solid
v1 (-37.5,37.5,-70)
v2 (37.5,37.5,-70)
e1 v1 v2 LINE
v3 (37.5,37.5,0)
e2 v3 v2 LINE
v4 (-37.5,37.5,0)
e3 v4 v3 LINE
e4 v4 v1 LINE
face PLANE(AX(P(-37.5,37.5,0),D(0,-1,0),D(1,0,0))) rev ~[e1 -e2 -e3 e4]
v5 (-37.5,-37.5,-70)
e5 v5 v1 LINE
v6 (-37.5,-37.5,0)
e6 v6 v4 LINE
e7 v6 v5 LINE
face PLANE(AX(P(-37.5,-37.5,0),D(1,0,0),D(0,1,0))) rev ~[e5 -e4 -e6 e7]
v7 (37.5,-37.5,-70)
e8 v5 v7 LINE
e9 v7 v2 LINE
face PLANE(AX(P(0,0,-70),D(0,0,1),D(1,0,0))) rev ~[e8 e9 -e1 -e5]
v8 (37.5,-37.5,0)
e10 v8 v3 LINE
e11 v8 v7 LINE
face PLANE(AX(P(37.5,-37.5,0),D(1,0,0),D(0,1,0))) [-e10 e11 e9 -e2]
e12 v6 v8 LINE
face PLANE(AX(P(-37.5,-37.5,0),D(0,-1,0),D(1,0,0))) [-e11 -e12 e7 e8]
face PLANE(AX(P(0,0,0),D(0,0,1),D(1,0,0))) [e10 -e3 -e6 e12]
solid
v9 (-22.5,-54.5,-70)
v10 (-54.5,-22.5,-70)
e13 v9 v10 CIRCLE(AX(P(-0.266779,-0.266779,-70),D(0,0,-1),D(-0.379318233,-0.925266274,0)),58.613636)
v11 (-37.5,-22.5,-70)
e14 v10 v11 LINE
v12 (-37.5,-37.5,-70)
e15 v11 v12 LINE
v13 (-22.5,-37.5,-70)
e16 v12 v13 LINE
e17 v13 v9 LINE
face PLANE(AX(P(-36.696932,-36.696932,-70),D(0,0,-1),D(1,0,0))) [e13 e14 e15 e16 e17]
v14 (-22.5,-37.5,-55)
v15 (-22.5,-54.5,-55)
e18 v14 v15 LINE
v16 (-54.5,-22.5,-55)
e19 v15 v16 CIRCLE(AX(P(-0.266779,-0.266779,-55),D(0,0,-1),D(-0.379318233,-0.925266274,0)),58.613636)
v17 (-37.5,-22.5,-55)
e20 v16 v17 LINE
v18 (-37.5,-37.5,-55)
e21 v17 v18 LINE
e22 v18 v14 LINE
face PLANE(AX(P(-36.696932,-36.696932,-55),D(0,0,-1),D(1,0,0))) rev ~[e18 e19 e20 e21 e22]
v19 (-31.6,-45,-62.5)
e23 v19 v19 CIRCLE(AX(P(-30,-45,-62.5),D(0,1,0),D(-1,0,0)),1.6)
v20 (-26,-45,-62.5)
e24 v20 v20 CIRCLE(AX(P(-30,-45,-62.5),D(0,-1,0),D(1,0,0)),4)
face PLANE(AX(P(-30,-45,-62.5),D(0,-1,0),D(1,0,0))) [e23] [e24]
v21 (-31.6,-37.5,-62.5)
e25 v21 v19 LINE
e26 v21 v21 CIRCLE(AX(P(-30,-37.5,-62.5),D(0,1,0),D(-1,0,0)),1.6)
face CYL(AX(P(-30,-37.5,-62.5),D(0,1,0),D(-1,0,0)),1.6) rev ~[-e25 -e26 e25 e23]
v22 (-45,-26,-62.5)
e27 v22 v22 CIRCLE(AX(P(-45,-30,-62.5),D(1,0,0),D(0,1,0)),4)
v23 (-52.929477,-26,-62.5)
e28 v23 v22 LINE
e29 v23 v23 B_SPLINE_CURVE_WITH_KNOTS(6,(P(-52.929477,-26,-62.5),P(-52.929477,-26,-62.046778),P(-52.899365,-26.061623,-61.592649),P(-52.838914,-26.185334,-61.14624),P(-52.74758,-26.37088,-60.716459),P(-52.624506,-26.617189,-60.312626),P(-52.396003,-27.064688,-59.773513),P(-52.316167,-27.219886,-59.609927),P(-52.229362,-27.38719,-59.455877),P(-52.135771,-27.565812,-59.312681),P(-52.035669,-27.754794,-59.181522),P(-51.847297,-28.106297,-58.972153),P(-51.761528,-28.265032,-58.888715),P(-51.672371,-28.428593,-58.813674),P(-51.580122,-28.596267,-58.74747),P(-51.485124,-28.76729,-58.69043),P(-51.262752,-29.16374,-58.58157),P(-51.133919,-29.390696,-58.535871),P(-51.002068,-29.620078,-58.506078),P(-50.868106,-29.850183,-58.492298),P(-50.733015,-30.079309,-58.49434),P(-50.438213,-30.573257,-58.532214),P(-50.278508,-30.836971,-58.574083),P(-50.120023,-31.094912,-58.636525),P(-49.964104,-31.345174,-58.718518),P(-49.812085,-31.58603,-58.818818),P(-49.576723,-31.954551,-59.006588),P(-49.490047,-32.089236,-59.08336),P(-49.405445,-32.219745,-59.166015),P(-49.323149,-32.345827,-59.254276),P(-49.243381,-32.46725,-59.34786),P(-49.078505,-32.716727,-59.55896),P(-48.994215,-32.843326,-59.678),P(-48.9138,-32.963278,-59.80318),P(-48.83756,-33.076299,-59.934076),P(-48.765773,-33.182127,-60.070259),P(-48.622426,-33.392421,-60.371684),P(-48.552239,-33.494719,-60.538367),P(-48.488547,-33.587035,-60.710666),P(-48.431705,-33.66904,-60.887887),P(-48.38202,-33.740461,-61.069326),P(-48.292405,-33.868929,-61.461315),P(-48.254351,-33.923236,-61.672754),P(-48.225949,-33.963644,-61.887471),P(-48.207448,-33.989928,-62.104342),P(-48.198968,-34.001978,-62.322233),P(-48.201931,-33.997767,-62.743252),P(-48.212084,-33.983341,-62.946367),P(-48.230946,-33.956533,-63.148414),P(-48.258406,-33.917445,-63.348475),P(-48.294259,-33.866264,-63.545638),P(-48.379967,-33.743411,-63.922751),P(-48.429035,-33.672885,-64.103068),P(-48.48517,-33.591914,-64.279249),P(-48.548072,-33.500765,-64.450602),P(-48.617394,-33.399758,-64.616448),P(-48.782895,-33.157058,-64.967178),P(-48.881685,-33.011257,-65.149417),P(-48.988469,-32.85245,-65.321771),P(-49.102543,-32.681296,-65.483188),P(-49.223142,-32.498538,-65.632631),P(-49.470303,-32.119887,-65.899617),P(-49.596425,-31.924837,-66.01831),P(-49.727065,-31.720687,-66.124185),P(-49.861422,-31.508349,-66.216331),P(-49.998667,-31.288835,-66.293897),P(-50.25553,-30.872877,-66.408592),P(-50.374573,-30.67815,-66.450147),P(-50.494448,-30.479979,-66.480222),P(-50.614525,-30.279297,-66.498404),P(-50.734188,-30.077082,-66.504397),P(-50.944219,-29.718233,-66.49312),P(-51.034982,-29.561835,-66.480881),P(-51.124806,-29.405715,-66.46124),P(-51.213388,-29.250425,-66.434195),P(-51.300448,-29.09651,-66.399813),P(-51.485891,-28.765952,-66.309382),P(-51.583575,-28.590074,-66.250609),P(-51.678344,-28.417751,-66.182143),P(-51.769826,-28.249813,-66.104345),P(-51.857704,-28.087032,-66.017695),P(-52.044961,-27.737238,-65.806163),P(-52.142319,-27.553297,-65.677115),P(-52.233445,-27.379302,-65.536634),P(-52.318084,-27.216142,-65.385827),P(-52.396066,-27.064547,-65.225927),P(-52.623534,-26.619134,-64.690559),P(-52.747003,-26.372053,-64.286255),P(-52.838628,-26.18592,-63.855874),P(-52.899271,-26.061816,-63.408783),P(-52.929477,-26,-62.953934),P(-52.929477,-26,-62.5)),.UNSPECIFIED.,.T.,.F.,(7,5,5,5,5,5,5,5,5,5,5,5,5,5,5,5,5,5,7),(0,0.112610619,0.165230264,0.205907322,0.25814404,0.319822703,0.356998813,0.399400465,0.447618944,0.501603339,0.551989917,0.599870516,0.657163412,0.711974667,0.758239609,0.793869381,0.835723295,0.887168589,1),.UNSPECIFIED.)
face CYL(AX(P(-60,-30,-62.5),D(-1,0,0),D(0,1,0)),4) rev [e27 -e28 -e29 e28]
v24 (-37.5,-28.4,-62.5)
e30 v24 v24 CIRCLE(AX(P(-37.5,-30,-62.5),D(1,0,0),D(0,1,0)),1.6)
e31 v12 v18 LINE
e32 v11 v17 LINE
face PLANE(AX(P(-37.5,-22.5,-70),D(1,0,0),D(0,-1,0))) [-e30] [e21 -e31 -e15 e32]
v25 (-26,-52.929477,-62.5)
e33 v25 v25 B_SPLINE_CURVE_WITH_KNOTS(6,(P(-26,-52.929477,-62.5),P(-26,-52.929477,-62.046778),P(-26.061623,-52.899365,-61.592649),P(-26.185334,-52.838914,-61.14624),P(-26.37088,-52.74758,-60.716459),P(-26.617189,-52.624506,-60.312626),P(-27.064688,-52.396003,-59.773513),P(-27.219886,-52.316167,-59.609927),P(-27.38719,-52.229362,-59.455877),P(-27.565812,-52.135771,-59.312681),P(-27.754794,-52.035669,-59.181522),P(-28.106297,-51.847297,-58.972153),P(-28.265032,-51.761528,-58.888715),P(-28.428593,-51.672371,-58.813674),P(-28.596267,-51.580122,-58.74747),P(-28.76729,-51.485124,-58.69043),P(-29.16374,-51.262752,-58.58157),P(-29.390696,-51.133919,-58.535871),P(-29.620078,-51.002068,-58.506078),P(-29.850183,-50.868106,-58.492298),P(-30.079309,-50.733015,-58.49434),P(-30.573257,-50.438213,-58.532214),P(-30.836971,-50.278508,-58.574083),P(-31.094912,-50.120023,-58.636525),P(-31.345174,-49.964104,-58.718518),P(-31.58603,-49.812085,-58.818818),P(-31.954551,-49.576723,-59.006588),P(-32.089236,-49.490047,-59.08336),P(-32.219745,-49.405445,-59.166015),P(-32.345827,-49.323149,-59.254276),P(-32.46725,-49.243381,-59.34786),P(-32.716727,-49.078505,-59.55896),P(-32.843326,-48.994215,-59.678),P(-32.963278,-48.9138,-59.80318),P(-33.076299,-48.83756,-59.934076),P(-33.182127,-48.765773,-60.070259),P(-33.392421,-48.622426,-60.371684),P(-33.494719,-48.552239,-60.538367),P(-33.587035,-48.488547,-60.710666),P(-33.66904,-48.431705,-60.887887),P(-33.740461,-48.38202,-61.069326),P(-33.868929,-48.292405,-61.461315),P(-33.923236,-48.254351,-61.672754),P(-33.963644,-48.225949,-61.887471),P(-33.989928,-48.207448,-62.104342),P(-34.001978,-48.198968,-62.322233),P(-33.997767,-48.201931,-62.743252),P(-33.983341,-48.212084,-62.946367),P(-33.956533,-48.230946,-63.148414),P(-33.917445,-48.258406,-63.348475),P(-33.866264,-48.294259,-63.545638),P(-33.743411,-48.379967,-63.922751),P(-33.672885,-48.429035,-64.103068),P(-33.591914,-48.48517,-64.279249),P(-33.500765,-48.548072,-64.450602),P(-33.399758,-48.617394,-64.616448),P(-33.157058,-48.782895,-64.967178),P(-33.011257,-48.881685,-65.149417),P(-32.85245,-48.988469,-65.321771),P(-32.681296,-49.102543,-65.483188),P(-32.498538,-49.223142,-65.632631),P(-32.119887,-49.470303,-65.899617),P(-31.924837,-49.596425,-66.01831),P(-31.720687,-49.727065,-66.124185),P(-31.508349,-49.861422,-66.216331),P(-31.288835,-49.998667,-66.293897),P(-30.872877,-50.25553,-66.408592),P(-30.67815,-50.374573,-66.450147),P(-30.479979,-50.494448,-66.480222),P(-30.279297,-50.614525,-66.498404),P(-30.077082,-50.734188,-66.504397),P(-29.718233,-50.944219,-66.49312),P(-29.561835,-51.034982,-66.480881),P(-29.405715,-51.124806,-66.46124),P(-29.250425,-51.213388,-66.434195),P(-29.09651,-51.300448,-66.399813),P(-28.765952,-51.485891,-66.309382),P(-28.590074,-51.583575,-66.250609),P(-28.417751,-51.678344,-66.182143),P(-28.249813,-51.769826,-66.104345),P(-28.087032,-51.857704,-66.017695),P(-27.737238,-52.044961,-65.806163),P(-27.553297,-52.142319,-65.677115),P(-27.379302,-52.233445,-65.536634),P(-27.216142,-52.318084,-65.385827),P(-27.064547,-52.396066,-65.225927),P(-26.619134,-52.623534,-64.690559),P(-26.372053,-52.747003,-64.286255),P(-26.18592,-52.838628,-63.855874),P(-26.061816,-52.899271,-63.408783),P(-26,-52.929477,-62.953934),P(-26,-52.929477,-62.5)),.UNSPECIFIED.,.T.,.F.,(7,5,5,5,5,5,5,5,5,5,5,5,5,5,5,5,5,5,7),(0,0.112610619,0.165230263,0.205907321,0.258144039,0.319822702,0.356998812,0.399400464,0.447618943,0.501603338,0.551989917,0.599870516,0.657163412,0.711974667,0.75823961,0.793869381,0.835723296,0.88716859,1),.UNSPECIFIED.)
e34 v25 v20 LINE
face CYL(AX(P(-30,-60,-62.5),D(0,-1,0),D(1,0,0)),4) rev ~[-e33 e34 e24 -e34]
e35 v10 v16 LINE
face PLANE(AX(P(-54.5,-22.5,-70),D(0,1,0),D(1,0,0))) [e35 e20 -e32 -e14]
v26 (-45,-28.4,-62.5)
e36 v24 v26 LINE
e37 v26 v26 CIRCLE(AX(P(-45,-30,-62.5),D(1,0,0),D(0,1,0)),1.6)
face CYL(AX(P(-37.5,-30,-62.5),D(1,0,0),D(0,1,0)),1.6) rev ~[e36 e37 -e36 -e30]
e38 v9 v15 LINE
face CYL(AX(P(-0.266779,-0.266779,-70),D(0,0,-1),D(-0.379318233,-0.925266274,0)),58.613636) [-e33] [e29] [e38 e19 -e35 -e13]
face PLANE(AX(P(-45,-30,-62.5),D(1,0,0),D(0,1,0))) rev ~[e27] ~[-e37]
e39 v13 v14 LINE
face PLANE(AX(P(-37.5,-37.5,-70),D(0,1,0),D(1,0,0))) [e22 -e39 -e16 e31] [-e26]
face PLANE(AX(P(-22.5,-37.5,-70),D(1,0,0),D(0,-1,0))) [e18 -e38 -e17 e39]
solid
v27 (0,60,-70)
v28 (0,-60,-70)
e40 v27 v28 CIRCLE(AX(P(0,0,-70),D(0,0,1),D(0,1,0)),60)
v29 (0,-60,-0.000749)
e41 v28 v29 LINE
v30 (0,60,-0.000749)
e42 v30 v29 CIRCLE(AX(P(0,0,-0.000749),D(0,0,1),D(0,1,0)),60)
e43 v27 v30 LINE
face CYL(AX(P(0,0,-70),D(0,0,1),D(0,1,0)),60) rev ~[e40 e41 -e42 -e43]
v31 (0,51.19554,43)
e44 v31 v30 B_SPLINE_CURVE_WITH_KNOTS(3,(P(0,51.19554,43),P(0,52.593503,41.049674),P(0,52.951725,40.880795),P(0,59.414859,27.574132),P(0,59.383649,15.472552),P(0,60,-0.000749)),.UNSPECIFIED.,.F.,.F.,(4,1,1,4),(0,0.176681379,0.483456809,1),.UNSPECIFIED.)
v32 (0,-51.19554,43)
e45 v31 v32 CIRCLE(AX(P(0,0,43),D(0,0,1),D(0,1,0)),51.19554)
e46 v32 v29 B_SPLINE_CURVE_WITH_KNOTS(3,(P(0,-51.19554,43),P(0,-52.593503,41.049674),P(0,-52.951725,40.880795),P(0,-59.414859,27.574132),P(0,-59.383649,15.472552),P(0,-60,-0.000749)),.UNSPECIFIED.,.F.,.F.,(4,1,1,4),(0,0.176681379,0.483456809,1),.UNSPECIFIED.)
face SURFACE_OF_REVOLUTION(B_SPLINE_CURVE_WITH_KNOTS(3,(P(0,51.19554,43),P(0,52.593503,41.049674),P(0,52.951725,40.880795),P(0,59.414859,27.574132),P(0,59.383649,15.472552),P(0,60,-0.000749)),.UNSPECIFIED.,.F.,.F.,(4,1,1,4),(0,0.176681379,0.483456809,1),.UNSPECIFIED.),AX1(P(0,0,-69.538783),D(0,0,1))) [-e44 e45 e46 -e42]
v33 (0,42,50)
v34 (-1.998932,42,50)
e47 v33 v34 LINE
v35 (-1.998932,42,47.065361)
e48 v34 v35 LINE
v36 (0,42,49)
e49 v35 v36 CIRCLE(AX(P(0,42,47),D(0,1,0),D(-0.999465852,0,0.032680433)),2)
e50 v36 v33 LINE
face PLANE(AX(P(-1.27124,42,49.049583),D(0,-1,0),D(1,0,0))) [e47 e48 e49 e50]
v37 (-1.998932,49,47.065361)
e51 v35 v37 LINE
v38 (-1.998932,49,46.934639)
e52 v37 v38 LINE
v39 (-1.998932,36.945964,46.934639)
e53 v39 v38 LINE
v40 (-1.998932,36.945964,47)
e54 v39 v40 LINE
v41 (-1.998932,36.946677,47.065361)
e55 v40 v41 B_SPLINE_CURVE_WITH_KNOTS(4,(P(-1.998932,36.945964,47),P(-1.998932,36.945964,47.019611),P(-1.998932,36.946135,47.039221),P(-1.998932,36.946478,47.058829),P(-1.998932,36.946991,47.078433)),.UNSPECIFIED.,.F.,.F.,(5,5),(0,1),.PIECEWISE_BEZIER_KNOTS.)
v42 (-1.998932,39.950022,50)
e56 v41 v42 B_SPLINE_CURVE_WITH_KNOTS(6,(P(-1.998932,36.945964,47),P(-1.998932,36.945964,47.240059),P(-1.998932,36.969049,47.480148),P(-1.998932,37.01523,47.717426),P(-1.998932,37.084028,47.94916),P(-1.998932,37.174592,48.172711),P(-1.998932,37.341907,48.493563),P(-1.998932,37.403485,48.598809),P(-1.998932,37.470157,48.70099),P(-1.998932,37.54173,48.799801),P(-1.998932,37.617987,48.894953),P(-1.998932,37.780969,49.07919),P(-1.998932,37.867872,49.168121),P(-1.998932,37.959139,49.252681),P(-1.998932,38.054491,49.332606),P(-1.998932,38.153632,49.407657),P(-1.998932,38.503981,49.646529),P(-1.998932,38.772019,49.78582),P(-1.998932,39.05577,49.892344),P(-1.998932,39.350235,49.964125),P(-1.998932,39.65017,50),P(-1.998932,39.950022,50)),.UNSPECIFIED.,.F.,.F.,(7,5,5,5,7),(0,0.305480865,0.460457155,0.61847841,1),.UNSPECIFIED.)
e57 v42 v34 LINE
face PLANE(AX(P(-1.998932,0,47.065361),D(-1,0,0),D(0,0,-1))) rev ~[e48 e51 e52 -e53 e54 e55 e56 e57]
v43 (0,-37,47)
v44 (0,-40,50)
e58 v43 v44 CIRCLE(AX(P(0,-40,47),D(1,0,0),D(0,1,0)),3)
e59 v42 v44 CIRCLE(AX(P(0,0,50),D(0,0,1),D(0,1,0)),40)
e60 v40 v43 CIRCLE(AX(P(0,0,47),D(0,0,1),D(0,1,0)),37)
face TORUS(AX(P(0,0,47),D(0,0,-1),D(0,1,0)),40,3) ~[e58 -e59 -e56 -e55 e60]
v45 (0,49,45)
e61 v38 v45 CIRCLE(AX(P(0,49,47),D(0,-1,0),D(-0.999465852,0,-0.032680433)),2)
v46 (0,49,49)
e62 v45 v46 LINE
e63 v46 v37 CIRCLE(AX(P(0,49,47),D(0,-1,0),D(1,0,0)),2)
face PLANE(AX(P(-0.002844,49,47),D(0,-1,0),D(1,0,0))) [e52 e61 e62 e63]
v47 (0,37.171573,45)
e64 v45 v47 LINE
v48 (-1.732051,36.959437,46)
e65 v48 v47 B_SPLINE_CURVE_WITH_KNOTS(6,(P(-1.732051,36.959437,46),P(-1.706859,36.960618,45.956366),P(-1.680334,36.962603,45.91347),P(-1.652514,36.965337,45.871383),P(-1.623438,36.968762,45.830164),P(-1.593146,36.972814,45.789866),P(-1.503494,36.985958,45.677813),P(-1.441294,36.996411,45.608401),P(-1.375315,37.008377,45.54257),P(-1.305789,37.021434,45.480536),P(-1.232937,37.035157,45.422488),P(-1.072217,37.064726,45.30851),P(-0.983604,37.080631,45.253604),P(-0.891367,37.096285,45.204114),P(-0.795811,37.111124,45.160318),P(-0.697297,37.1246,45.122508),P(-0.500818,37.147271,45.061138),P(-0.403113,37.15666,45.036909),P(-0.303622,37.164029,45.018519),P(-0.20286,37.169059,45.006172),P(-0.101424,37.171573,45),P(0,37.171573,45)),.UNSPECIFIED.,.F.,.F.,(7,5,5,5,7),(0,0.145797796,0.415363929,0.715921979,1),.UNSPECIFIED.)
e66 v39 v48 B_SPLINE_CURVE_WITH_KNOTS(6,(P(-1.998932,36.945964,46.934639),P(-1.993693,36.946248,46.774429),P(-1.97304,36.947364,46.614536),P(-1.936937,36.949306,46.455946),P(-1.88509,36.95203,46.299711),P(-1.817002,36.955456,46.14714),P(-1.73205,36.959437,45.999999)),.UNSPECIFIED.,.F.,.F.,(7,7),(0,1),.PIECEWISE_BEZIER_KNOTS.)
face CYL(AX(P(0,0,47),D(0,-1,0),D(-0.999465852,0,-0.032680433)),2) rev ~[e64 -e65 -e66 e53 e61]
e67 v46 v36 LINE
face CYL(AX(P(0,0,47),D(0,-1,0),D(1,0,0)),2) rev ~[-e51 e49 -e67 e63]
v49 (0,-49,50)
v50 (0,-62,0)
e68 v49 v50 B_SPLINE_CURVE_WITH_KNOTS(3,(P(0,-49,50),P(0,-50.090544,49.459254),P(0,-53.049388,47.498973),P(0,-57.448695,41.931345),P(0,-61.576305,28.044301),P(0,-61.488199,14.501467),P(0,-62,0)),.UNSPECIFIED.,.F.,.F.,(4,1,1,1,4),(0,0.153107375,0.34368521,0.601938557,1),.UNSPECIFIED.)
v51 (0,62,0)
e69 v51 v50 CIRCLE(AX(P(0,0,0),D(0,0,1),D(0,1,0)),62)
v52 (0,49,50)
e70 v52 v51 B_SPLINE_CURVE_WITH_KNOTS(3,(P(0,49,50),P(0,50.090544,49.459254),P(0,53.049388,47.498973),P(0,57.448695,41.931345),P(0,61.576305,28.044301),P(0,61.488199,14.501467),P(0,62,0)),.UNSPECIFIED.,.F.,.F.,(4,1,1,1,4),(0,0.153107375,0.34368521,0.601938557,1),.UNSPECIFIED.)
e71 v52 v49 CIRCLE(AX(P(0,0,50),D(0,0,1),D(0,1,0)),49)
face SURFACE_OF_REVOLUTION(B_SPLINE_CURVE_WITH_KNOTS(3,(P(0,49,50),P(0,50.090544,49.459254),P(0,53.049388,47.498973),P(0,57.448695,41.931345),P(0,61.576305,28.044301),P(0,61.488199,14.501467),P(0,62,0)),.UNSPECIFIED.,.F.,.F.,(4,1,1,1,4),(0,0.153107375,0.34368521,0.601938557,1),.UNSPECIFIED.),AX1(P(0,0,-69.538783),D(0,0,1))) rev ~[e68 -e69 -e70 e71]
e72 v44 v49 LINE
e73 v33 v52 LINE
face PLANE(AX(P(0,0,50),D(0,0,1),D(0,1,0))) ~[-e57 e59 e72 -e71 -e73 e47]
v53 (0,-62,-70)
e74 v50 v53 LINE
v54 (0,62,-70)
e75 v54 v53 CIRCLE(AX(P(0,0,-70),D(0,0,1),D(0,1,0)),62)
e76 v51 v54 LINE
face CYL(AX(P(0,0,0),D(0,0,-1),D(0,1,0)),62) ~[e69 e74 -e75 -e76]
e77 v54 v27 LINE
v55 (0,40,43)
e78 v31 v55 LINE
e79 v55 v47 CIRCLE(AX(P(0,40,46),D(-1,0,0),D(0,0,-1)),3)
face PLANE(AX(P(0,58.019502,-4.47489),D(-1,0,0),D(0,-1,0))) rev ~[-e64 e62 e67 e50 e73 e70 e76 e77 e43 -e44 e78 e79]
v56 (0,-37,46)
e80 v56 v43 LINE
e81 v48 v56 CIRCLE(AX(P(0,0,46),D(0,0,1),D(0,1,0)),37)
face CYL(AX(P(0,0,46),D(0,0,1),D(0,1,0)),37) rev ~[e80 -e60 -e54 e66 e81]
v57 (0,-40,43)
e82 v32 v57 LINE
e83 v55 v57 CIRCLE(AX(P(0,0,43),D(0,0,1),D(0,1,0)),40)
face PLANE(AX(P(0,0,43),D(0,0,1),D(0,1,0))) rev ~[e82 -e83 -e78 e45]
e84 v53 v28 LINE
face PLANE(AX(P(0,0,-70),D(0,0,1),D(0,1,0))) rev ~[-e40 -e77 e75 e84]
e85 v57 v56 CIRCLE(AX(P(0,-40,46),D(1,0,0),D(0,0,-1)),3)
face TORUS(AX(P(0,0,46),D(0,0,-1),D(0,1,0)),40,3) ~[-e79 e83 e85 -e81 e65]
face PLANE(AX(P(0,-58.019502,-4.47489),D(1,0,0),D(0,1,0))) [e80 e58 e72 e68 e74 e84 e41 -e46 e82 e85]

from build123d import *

# Parameters (mm, degrees)
F1_ANGLE_BACK = 90
F1_ANGLE      = 180
F3_DEPTH      = 49
F4_DEPTH      = 42
F5_W          = 75
F5_H          = 75
F6_DEPTH      = 70
F8_DEPTH      = 15
F9_R          = 1.6
F10_DEPTH     = 15
F12_R         = 4
F13_DEPTH     = 15
F14_R         = 1.6
F15_DEPTH     = 15
F17_R         = 4
F18_DEPTH     = 15


with BuildPart() as f1:
    # F0 (on Front) → F1 (revolve)
    with BuildSketch(Plane.XZ, mode=Mode.PRIVATE) as f1_sk:
        with BuildLine():
            ThreePointArc((-37, 47), (-37.8786796564, 49.1213203436), (-40, 50))
            Line((-40, 50), (-49, 50))
            add(Edge.make_bspline(
                [(-49, 50), (-50.0905438599, 49.4592544488), (-53.0493875637, 47.4989733534), (-57.4486951492, 41.931344871), (-61.5763053799, 28.0443008729), (-61.4881986154, 14.5014666819), (-62, 0)],
                knots=[0, 0, 0, 0, 0.1531073754, 0.3436852098, 0.6019385566, 1, 1, 1, 1], degree=3))
            Line((-62, 0), (-62, -70))
            Line((-62, -70), (-60, -70))
            Line((-60, -70), (-60, -0.0007486343))
            add(Edge.make_bspline(
                [(-51.1955396277, 43), (-52.5935031474, 41.0496741533), (-52.9517254174, 40.8807945198), (-59.4148587907, 27.5741318966), (-59.3836485459, 15.4725515941), (-60, -0.0007486343)],
                knots=[0, 0, 0, 0, 0.1766813791, 0.4834568095, 1, 1, 1, 1], degree=3))
            Line((-51.1955396277, 43), (-40, 43))
            ThreePointArc((-40, 43), (-37.8786796564, 43.8786796564), (-37, 46))
            Line((-37, 46), (-37, 47))
        make_face()
    revolve(f1_sk.sketch.rotate(Axis((0, 0, -69.538783133), (0, 0, 1)), -F1_ANGLE_BACK), axis=Axis((0, 0, -69.538783133), (0, 0, 1)), revolution_arc=F1_ANGLE)

    # F2 (on Front) → F3 (cut)
    with BuildSketch(Plane.XZ):
        with BuildLine():
            ThreePointArc((0, 45), (1.4142135624, 45.5857864376), (2, 47))
            ThreePointArc((2, 47), (1.4142135624, 48.4142135624), (0, 49))
            ThreePointArc((0, 49), (-1.3909130574, 48.4371363424), (-1.998931704, 47.0653608667))
            Line((-1.998931704, 47.0653608667), (-1.998931704, 46.9346391333))
            ThreePointArc((-1.998931704, 46.9346391333), (-1.3909130574, 45.5628636576), (0, 45))
        make_face()
    extrude(amount=-F3_DEPTH, mode=Mode.SUBTRACT)

    # F2 (on Front) → F4 (cut)
    with BuildSketch(Plane.XZ):
        with BuildLine():
            ThreePointArc((-1.998931704, 47.0653608667), (-1.3909130574, 48.4371363424), (0, 49))
            Line((0, 49), (0, 50.3604523001))
            Line((0, 50.3604523001), (-1.998931704, 50.3604523001))
            Line((-1.998931704, 50.3604523001), (-1.998931704, 47.0653608667))
        make_face()
    extrude(amount=-F4_DEPTH, mode=Mode.SUBTRACT)


with BuildPart() as f6:
    # F5 (on Top) → F6 (new body)
    with BuildSketch(Plane.XY):
        Rectangle(F5_W, F5_H)
    extrude(amount=-F6_DEPTH)


with BuildPart() as f8:
    # F7 (on face) → F8 (new body)
    with BuildSketch(Plane(origin=(0, 0, -70), x_dir=(1, 0, 0), z_dir=(0, 0, -1))):
        with BuildLine():
            Line((-37.5, 22.5), (-37.5, 37.5))
            Line((-37.5, 37.5), (-22.5, 37.5))
            Line((-22.5, 37.5), (-22.5, 54.5))
            ThreePointArc((-22.5, 54.5), (-41.7128787943, 41.7128787943), (-54.5, 22.5))
            Line((-54.5, 22.5), (-37.5, 22.5))
        make_face()
    extrude(amount=-F8_DEPTH)

    # F9 (on face) → F10 (cut)
    with BuildSketch(Plane.YZ.offset(-37.5)):
        with Locations((-30, -62.5)):
            Circle(F9_R)
    extrude(amount=-F10_DEPTH, mode=Mode.SUBTRACT)

    # F12 (on offset) → F13 (cut)
    with BuildSketch(Plane.YZ.offset(-60)):
        with Locations((-30, -62.5)):
            Circle(F12_R)
    extrude(amount=F13_DEPTH, mode=Mode.SUBTRACT)

    # F14 (on face) → F15 (cut)
    with BuildSketch(Plane(origin=(0, -37.5, 0), x_dir=(-1, 0, 0), z_dir=(0, 1, 0))):
        with Locations((30, -62.5)):
            Circle(F14_R)
    extrude(amount=-F15_DEPTH, mode=Mode.SUBTRACT)

    # F17 (on offset) → F18 (cut)
    with BuildSketch(Plane.XZ.offset(60)):
        with Locations((-30, -62.5)):
            Circle(F17_R)
    extrude(amount=-F18_DEPTH, mode=Mode.SUBTRACT)


solid = Compound([f1.part, f6.part, f8.part])
